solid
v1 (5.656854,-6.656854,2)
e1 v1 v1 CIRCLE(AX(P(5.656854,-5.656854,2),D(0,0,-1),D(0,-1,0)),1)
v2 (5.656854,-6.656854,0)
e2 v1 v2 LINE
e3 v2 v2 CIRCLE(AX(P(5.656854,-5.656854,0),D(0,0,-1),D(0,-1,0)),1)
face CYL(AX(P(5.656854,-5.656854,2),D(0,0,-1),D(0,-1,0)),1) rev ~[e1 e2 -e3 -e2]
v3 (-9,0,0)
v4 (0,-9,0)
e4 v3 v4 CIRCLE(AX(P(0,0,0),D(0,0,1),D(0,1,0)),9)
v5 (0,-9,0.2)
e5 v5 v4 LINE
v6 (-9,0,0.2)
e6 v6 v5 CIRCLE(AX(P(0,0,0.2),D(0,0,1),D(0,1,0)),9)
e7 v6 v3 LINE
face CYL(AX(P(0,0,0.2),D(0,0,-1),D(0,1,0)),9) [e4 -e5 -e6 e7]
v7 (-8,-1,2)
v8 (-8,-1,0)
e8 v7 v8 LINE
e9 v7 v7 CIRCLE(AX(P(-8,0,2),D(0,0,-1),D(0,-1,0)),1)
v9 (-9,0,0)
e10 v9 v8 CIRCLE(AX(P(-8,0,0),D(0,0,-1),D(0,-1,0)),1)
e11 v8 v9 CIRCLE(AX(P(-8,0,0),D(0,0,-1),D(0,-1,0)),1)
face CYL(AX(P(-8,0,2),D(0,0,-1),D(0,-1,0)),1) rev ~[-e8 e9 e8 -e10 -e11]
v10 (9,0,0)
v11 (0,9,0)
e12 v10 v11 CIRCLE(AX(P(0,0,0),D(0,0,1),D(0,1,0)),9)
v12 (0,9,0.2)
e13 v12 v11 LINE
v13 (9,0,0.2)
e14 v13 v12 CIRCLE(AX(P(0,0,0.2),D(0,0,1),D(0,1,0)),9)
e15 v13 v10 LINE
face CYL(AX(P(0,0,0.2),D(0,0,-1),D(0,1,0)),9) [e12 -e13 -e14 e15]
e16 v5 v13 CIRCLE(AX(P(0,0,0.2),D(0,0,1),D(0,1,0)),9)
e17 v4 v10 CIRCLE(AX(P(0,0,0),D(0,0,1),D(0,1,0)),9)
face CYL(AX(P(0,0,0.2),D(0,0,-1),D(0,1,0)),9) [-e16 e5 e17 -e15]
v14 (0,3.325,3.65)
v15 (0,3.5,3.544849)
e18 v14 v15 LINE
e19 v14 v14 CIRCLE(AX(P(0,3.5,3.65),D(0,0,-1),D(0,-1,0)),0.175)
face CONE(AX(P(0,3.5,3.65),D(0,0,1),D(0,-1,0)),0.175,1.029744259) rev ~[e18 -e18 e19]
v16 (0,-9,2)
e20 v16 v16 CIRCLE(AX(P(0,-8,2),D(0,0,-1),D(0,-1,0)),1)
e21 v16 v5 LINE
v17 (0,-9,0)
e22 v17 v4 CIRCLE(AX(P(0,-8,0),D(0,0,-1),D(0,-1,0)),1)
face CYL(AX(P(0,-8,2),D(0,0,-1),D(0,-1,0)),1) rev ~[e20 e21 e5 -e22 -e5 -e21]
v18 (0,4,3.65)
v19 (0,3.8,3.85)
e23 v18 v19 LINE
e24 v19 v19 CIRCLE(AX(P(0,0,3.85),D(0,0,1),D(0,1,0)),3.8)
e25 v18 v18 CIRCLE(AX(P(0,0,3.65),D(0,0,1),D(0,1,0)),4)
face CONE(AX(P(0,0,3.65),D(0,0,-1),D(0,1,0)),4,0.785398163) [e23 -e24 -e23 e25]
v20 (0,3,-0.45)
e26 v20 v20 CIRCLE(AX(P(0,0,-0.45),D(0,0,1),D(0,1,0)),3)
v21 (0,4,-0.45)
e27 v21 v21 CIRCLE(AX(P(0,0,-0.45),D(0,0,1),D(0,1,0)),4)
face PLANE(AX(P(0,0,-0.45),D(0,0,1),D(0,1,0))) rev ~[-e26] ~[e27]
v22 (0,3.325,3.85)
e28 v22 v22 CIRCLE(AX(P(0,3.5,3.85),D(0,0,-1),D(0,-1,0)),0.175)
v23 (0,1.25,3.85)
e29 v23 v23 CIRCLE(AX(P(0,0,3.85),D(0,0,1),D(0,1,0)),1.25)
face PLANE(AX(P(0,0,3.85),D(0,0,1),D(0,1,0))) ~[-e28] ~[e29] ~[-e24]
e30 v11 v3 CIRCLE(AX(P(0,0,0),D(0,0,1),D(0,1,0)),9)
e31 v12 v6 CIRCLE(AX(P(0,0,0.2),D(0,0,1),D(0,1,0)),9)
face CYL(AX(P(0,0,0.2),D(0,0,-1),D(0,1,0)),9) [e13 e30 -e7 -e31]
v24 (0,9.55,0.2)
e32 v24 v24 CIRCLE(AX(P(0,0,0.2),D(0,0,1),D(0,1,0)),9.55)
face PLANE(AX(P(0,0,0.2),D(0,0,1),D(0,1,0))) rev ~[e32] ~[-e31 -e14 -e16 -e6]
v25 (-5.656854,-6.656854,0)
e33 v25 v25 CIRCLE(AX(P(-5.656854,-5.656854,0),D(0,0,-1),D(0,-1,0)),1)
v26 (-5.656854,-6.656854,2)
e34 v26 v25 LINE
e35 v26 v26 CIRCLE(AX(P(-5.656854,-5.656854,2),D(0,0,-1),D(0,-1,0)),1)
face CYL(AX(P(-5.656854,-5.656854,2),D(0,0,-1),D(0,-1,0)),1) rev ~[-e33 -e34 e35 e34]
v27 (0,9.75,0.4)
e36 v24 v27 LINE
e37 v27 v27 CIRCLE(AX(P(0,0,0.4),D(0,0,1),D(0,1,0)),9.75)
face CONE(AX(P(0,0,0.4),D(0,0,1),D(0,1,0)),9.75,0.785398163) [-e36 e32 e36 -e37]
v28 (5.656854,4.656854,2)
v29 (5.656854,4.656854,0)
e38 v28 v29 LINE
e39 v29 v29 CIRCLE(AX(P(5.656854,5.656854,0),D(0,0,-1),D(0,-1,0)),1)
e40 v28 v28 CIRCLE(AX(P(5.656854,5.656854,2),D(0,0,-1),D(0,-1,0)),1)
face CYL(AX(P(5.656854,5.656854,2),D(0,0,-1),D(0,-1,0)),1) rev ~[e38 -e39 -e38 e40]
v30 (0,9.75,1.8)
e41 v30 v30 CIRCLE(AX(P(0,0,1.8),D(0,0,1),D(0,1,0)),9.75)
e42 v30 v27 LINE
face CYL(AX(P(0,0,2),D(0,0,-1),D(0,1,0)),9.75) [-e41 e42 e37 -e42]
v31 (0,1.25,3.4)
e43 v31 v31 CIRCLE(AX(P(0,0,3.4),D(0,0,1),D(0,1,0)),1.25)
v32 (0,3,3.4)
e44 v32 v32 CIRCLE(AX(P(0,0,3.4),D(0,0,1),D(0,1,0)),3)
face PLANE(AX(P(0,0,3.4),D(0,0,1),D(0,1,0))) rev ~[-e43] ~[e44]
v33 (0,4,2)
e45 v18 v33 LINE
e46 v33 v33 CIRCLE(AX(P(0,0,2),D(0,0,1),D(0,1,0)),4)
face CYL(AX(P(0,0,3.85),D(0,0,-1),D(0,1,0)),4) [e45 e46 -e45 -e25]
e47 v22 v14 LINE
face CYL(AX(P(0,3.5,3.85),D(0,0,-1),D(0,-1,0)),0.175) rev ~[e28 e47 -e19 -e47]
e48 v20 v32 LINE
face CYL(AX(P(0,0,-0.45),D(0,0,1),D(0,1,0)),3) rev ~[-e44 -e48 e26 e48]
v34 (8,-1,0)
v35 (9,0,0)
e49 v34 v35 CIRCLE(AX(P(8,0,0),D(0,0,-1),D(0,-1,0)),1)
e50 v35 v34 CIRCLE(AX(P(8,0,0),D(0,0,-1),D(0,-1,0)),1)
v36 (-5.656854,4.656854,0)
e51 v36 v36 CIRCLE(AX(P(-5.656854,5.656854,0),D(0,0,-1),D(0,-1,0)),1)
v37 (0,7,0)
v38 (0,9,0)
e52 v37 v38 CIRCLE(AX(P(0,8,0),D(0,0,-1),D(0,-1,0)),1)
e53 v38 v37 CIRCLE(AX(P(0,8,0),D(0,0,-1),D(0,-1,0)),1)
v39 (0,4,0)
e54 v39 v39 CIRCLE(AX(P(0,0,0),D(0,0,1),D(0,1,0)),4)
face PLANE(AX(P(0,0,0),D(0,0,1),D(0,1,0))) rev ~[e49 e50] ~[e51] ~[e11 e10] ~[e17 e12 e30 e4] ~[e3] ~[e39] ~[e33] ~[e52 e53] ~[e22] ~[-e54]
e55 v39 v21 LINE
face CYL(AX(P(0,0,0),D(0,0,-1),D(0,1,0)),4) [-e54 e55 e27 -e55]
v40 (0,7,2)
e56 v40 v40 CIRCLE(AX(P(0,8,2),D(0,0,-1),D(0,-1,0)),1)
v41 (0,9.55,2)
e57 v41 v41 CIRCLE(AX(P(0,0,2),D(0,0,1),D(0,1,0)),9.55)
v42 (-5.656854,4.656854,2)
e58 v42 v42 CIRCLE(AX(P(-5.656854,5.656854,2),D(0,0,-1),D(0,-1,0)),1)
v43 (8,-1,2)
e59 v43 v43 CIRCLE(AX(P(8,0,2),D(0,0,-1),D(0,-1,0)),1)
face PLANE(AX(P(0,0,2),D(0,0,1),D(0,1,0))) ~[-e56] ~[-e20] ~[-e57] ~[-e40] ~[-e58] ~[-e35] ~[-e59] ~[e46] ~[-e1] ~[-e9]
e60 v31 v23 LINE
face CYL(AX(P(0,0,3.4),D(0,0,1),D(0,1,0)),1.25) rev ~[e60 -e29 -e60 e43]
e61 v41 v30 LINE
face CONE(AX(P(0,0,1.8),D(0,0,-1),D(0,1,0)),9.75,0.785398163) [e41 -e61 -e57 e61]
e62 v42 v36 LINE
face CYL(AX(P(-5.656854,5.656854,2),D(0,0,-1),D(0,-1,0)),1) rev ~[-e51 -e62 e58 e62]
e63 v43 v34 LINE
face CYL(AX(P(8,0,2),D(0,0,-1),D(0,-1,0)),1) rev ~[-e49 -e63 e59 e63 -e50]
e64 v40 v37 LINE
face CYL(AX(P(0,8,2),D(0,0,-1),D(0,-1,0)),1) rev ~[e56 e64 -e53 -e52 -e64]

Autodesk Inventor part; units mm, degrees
ref_plane "YZ Plane" through (0, 0, 0) normal (1, 0, 0) x (0, 1, 0)
ref_plane "XZ Plane" through (0, 0, 0) normal (0, 1, 0) x (-1, 0, 0)
ref_plane "XY Plane" through (0, 0, 0) normal (0, 0, 1) x (1, 0, 0)
sketch "スケッチ1" plane through (0, 0, 0) normal (1, 0, 0) x (0, 1, 0)
  line L0 (0, 0) -> (0, 10.078026) construction
  line L1 (4, 0) -> (4, -0.45)
  line L2 (4, -0.45) -> (3, -0.45)
  line L3 (3, -0.45) -> (3, 3.4)
  line L4 (3, 3.4) -> (1.25, 3.4)
  line L5 (1.25, 3.4) -> (1.25, 3.85)
  line L6 (1.25, 3.85) -> (4, 3.85)
  line L7 (4, 3.85) -> (4, 2)
  line L8 (4, 2) -> (9.75, 2)
  line L9 (9.75, 2) -> (9.75, 0.2)
  line L10 (9.75, 0.2) -> (9, 0.2)
  line L11 (9, 0.2) -> (9, 0)
  line L12 (9, 0) -> (4, 0)
  line L13 (4, 2) -> (4, 0) construction
  dimension "d0" = 19.5
  dimension "d1" = 18
  dimension "d2" = 2
  dimension "d3" = 1.8
  dimension "d4" = 8
  dimension "d5" = 4.3
  dimension "d6" = 2.5
  dimension "d7" = 1.85
  dimension "d8" = 6
  dimension "d10" = 3.85
  dimension "d37" = 3.4
revolve "回転1" add sketch "スケッチ1" angle 360 about axis through (0, 0, 0) along (0, 0, 1)
sketch "スケッチ2" plane through (0, 0, 2) normal (0, 0, 1) x (1, 0, 0)
  circle A0 centre (0, 0) radius 8 construction
  line L0 (0, 8) -> (0, 0) construction
  point P0 (-5.656854, 5.656854)
  point P1 (-8, 0)
  point P2 (-5.656854, -5.656854)
  point P3 (0, -8)
  point P4 (5.656854, -5.656854)
  point P5 (8, 0)
  point P6 (5.656854, 5.656854)
  dimension "d13" = 16
  dimension "d16" = 360
hole "穴1" at (0, 8, 2) at (-5.656854, 5.656854, 2) at (-8, 0, 2) at (-5.656854, -5.656854, 2) at (0, -8, 2) at (5.656854, -5.656854, 2) at (8, 0, 2) at (5.656854, 5.656854, 2) direction (0, 0, -1) diameter 2 end through all
chamfer "面取り1" distance 0.2 angle 45 3 edges at (0, -9.75, 2) (0, -9.75, 0.2) (0, -4, 3.85)
sketch "スケッチ3" plane through (0, 0, 3.85) normal (0, 0, 1) x (1, 0, 0)
  line L0 (0, 3.5) -> (0, 0) construction
  dimension "d29" = 3.5
hole "穴2" at (0, 3.5, 3.85) direction (0, 0, -1) diameter 0.35 depth 0.2 tip angle 118
properties part number "XM430_HORN"
